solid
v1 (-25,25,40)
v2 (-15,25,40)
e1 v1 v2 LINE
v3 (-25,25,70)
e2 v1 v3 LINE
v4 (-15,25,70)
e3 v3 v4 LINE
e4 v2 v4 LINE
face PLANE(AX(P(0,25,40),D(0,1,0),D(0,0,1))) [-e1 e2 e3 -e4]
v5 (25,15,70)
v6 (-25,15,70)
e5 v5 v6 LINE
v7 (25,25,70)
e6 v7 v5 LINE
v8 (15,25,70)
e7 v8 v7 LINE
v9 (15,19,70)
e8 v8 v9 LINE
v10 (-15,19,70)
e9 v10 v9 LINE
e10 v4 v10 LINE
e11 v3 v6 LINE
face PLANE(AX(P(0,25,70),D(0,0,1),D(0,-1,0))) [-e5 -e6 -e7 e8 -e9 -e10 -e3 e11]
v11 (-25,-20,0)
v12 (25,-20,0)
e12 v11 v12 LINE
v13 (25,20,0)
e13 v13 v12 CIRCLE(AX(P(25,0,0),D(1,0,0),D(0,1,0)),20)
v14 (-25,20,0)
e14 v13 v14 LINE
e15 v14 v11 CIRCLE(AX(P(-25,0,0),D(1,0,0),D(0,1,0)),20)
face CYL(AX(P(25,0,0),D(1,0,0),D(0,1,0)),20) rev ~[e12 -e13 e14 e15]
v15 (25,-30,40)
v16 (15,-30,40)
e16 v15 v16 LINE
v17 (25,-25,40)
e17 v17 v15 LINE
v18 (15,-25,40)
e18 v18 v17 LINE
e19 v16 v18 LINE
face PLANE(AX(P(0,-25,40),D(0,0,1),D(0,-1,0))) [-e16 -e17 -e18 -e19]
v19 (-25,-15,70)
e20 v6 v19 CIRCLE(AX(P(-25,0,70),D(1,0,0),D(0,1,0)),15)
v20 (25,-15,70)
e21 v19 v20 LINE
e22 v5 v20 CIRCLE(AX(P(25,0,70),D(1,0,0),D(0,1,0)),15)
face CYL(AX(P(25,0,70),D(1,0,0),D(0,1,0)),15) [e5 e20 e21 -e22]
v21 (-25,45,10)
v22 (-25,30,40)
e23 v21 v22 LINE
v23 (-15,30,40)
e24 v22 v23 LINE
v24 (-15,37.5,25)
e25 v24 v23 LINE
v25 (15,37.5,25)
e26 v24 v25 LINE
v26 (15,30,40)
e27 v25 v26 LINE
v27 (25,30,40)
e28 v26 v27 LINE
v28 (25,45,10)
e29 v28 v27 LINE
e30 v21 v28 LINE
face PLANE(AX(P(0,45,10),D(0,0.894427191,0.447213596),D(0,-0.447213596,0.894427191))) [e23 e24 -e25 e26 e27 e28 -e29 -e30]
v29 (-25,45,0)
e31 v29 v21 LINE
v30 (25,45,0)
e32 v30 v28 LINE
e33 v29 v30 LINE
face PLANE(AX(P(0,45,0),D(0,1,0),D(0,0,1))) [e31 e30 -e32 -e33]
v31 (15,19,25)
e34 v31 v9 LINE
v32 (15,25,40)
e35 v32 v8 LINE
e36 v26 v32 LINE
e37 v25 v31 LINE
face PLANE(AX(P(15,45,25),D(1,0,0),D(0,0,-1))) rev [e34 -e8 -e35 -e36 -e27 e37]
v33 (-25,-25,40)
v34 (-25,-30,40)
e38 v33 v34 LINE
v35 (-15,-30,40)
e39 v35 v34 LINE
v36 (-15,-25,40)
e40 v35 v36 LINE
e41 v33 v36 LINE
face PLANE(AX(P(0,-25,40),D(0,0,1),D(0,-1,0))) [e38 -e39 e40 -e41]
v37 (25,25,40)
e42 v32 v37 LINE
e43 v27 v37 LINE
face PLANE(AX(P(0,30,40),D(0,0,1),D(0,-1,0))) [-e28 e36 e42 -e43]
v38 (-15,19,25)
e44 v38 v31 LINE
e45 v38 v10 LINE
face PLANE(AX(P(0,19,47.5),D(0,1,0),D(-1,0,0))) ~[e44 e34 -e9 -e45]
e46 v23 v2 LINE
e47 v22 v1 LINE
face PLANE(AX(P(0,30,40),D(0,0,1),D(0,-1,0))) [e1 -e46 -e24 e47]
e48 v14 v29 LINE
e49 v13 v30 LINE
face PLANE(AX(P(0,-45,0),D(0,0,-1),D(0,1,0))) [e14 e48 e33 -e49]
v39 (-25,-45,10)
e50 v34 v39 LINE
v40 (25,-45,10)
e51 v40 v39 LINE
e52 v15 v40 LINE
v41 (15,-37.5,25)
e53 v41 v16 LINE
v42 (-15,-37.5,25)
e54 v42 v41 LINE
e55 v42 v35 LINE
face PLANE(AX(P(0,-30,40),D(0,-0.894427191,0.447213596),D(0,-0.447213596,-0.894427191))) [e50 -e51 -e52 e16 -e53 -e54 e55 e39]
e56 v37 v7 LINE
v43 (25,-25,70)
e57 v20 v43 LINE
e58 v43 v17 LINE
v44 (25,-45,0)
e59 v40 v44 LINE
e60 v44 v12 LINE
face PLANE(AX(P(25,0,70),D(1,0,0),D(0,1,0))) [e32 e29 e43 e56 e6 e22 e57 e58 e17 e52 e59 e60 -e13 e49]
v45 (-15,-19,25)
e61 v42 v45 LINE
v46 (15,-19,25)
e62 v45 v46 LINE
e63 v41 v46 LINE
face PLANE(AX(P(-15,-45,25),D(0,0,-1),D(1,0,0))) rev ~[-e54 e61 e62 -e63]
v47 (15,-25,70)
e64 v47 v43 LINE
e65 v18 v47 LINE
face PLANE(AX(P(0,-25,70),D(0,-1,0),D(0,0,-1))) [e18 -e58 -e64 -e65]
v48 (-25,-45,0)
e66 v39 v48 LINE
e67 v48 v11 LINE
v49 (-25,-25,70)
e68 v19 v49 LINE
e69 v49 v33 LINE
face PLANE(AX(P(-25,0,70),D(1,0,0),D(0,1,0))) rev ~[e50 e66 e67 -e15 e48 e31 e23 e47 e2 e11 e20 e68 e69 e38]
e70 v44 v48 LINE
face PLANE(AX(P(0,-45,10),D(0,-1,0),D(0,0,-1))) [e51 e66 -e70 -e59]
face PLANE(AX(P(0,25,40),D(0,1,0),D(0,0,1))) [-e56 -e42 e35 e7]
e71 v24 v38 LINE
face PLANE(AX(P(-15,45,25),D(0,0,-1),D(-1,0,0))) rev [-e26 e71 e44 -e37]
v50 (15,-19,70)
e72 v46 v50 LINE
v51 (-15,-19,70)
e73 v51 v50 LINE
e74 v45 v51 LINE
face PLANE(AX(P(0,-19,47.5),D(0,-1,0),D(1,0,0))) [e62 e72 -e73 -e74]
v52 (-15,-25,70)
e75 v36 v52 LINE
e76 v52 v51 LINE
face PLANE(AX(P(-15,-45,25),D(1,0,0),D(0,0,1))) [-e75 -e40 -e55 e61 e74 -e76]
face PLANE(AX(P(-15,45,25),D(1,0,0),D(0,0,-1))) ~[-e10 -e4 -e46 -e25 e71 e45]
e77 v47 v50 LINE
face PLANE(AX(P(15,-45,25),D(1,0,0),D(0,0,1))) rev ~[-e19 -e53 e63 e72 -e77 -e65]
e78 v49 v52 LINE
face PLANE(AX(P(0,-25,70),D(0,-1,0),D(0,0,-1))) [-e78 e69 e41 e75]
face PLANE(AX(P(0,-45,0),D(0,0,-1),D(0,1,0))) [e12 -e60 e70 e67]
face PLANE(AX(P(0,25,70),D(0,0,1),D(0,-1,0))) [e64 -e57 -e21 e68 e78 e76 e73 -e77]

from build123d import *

# Parameters (mm, degrees)
F1_DEPTH = 25
F2_R     = 20
F3_DEPTH = 50.001
F4_R     = 15
F5_DEPTH = 50
F6_W     = 30
F6_H     = 45
F7_DEPTH = 26


# Not quite as in the source:
# - a pattern or mirror of a feature is missing from the dataset's text; its kind, count and spacing are read off the source's solid


with BuildPart() as f1:
    # F0 (on Right) → F1 (new body, symmetric)
    with BuildSketch(Plane.YZ):
        Polygon((-45, 0), (0, 0), (45, 0), (45, 10), (30, 40), (25, 40), (25, 70), (0, 70), (-25, 70), (-25, 40), (-30, 40), (-45, 10), align=None)
    extrude(amount=F1_DEPTH, both=True)

    # F2 (on face) → F3 (cut, through all)
    with BuildSketch(Plane.YZ.offset(25)):
        Circle(F2_R)
    extrude(amount=-F3_DEPTH, mode=Mode.SUBTRACT)

    # F4 (on face) → F5 (join)
    with BuildSketch(Plane.YZ.offset(25)):
        with Locations((0, 70)):
            Circle(F4_R)
    extrude(amount=-F5_DEPTH)

    # F6 (on face) → F7 (cut)
    with BuildSketch(Plane.XZ.offset(45)):
        with Locations((0, 47.5)):
            Rectangle(F6_W, F6_H)
    f7 = extrude(amount=-F7_DEPTH, mode=Mode.SUBTRACT)

    # F7_copies: F7 across plane
    add(f7.mirror(Plane.ZX), mode=Mode.SUBTRACT)


solid = f1.part
